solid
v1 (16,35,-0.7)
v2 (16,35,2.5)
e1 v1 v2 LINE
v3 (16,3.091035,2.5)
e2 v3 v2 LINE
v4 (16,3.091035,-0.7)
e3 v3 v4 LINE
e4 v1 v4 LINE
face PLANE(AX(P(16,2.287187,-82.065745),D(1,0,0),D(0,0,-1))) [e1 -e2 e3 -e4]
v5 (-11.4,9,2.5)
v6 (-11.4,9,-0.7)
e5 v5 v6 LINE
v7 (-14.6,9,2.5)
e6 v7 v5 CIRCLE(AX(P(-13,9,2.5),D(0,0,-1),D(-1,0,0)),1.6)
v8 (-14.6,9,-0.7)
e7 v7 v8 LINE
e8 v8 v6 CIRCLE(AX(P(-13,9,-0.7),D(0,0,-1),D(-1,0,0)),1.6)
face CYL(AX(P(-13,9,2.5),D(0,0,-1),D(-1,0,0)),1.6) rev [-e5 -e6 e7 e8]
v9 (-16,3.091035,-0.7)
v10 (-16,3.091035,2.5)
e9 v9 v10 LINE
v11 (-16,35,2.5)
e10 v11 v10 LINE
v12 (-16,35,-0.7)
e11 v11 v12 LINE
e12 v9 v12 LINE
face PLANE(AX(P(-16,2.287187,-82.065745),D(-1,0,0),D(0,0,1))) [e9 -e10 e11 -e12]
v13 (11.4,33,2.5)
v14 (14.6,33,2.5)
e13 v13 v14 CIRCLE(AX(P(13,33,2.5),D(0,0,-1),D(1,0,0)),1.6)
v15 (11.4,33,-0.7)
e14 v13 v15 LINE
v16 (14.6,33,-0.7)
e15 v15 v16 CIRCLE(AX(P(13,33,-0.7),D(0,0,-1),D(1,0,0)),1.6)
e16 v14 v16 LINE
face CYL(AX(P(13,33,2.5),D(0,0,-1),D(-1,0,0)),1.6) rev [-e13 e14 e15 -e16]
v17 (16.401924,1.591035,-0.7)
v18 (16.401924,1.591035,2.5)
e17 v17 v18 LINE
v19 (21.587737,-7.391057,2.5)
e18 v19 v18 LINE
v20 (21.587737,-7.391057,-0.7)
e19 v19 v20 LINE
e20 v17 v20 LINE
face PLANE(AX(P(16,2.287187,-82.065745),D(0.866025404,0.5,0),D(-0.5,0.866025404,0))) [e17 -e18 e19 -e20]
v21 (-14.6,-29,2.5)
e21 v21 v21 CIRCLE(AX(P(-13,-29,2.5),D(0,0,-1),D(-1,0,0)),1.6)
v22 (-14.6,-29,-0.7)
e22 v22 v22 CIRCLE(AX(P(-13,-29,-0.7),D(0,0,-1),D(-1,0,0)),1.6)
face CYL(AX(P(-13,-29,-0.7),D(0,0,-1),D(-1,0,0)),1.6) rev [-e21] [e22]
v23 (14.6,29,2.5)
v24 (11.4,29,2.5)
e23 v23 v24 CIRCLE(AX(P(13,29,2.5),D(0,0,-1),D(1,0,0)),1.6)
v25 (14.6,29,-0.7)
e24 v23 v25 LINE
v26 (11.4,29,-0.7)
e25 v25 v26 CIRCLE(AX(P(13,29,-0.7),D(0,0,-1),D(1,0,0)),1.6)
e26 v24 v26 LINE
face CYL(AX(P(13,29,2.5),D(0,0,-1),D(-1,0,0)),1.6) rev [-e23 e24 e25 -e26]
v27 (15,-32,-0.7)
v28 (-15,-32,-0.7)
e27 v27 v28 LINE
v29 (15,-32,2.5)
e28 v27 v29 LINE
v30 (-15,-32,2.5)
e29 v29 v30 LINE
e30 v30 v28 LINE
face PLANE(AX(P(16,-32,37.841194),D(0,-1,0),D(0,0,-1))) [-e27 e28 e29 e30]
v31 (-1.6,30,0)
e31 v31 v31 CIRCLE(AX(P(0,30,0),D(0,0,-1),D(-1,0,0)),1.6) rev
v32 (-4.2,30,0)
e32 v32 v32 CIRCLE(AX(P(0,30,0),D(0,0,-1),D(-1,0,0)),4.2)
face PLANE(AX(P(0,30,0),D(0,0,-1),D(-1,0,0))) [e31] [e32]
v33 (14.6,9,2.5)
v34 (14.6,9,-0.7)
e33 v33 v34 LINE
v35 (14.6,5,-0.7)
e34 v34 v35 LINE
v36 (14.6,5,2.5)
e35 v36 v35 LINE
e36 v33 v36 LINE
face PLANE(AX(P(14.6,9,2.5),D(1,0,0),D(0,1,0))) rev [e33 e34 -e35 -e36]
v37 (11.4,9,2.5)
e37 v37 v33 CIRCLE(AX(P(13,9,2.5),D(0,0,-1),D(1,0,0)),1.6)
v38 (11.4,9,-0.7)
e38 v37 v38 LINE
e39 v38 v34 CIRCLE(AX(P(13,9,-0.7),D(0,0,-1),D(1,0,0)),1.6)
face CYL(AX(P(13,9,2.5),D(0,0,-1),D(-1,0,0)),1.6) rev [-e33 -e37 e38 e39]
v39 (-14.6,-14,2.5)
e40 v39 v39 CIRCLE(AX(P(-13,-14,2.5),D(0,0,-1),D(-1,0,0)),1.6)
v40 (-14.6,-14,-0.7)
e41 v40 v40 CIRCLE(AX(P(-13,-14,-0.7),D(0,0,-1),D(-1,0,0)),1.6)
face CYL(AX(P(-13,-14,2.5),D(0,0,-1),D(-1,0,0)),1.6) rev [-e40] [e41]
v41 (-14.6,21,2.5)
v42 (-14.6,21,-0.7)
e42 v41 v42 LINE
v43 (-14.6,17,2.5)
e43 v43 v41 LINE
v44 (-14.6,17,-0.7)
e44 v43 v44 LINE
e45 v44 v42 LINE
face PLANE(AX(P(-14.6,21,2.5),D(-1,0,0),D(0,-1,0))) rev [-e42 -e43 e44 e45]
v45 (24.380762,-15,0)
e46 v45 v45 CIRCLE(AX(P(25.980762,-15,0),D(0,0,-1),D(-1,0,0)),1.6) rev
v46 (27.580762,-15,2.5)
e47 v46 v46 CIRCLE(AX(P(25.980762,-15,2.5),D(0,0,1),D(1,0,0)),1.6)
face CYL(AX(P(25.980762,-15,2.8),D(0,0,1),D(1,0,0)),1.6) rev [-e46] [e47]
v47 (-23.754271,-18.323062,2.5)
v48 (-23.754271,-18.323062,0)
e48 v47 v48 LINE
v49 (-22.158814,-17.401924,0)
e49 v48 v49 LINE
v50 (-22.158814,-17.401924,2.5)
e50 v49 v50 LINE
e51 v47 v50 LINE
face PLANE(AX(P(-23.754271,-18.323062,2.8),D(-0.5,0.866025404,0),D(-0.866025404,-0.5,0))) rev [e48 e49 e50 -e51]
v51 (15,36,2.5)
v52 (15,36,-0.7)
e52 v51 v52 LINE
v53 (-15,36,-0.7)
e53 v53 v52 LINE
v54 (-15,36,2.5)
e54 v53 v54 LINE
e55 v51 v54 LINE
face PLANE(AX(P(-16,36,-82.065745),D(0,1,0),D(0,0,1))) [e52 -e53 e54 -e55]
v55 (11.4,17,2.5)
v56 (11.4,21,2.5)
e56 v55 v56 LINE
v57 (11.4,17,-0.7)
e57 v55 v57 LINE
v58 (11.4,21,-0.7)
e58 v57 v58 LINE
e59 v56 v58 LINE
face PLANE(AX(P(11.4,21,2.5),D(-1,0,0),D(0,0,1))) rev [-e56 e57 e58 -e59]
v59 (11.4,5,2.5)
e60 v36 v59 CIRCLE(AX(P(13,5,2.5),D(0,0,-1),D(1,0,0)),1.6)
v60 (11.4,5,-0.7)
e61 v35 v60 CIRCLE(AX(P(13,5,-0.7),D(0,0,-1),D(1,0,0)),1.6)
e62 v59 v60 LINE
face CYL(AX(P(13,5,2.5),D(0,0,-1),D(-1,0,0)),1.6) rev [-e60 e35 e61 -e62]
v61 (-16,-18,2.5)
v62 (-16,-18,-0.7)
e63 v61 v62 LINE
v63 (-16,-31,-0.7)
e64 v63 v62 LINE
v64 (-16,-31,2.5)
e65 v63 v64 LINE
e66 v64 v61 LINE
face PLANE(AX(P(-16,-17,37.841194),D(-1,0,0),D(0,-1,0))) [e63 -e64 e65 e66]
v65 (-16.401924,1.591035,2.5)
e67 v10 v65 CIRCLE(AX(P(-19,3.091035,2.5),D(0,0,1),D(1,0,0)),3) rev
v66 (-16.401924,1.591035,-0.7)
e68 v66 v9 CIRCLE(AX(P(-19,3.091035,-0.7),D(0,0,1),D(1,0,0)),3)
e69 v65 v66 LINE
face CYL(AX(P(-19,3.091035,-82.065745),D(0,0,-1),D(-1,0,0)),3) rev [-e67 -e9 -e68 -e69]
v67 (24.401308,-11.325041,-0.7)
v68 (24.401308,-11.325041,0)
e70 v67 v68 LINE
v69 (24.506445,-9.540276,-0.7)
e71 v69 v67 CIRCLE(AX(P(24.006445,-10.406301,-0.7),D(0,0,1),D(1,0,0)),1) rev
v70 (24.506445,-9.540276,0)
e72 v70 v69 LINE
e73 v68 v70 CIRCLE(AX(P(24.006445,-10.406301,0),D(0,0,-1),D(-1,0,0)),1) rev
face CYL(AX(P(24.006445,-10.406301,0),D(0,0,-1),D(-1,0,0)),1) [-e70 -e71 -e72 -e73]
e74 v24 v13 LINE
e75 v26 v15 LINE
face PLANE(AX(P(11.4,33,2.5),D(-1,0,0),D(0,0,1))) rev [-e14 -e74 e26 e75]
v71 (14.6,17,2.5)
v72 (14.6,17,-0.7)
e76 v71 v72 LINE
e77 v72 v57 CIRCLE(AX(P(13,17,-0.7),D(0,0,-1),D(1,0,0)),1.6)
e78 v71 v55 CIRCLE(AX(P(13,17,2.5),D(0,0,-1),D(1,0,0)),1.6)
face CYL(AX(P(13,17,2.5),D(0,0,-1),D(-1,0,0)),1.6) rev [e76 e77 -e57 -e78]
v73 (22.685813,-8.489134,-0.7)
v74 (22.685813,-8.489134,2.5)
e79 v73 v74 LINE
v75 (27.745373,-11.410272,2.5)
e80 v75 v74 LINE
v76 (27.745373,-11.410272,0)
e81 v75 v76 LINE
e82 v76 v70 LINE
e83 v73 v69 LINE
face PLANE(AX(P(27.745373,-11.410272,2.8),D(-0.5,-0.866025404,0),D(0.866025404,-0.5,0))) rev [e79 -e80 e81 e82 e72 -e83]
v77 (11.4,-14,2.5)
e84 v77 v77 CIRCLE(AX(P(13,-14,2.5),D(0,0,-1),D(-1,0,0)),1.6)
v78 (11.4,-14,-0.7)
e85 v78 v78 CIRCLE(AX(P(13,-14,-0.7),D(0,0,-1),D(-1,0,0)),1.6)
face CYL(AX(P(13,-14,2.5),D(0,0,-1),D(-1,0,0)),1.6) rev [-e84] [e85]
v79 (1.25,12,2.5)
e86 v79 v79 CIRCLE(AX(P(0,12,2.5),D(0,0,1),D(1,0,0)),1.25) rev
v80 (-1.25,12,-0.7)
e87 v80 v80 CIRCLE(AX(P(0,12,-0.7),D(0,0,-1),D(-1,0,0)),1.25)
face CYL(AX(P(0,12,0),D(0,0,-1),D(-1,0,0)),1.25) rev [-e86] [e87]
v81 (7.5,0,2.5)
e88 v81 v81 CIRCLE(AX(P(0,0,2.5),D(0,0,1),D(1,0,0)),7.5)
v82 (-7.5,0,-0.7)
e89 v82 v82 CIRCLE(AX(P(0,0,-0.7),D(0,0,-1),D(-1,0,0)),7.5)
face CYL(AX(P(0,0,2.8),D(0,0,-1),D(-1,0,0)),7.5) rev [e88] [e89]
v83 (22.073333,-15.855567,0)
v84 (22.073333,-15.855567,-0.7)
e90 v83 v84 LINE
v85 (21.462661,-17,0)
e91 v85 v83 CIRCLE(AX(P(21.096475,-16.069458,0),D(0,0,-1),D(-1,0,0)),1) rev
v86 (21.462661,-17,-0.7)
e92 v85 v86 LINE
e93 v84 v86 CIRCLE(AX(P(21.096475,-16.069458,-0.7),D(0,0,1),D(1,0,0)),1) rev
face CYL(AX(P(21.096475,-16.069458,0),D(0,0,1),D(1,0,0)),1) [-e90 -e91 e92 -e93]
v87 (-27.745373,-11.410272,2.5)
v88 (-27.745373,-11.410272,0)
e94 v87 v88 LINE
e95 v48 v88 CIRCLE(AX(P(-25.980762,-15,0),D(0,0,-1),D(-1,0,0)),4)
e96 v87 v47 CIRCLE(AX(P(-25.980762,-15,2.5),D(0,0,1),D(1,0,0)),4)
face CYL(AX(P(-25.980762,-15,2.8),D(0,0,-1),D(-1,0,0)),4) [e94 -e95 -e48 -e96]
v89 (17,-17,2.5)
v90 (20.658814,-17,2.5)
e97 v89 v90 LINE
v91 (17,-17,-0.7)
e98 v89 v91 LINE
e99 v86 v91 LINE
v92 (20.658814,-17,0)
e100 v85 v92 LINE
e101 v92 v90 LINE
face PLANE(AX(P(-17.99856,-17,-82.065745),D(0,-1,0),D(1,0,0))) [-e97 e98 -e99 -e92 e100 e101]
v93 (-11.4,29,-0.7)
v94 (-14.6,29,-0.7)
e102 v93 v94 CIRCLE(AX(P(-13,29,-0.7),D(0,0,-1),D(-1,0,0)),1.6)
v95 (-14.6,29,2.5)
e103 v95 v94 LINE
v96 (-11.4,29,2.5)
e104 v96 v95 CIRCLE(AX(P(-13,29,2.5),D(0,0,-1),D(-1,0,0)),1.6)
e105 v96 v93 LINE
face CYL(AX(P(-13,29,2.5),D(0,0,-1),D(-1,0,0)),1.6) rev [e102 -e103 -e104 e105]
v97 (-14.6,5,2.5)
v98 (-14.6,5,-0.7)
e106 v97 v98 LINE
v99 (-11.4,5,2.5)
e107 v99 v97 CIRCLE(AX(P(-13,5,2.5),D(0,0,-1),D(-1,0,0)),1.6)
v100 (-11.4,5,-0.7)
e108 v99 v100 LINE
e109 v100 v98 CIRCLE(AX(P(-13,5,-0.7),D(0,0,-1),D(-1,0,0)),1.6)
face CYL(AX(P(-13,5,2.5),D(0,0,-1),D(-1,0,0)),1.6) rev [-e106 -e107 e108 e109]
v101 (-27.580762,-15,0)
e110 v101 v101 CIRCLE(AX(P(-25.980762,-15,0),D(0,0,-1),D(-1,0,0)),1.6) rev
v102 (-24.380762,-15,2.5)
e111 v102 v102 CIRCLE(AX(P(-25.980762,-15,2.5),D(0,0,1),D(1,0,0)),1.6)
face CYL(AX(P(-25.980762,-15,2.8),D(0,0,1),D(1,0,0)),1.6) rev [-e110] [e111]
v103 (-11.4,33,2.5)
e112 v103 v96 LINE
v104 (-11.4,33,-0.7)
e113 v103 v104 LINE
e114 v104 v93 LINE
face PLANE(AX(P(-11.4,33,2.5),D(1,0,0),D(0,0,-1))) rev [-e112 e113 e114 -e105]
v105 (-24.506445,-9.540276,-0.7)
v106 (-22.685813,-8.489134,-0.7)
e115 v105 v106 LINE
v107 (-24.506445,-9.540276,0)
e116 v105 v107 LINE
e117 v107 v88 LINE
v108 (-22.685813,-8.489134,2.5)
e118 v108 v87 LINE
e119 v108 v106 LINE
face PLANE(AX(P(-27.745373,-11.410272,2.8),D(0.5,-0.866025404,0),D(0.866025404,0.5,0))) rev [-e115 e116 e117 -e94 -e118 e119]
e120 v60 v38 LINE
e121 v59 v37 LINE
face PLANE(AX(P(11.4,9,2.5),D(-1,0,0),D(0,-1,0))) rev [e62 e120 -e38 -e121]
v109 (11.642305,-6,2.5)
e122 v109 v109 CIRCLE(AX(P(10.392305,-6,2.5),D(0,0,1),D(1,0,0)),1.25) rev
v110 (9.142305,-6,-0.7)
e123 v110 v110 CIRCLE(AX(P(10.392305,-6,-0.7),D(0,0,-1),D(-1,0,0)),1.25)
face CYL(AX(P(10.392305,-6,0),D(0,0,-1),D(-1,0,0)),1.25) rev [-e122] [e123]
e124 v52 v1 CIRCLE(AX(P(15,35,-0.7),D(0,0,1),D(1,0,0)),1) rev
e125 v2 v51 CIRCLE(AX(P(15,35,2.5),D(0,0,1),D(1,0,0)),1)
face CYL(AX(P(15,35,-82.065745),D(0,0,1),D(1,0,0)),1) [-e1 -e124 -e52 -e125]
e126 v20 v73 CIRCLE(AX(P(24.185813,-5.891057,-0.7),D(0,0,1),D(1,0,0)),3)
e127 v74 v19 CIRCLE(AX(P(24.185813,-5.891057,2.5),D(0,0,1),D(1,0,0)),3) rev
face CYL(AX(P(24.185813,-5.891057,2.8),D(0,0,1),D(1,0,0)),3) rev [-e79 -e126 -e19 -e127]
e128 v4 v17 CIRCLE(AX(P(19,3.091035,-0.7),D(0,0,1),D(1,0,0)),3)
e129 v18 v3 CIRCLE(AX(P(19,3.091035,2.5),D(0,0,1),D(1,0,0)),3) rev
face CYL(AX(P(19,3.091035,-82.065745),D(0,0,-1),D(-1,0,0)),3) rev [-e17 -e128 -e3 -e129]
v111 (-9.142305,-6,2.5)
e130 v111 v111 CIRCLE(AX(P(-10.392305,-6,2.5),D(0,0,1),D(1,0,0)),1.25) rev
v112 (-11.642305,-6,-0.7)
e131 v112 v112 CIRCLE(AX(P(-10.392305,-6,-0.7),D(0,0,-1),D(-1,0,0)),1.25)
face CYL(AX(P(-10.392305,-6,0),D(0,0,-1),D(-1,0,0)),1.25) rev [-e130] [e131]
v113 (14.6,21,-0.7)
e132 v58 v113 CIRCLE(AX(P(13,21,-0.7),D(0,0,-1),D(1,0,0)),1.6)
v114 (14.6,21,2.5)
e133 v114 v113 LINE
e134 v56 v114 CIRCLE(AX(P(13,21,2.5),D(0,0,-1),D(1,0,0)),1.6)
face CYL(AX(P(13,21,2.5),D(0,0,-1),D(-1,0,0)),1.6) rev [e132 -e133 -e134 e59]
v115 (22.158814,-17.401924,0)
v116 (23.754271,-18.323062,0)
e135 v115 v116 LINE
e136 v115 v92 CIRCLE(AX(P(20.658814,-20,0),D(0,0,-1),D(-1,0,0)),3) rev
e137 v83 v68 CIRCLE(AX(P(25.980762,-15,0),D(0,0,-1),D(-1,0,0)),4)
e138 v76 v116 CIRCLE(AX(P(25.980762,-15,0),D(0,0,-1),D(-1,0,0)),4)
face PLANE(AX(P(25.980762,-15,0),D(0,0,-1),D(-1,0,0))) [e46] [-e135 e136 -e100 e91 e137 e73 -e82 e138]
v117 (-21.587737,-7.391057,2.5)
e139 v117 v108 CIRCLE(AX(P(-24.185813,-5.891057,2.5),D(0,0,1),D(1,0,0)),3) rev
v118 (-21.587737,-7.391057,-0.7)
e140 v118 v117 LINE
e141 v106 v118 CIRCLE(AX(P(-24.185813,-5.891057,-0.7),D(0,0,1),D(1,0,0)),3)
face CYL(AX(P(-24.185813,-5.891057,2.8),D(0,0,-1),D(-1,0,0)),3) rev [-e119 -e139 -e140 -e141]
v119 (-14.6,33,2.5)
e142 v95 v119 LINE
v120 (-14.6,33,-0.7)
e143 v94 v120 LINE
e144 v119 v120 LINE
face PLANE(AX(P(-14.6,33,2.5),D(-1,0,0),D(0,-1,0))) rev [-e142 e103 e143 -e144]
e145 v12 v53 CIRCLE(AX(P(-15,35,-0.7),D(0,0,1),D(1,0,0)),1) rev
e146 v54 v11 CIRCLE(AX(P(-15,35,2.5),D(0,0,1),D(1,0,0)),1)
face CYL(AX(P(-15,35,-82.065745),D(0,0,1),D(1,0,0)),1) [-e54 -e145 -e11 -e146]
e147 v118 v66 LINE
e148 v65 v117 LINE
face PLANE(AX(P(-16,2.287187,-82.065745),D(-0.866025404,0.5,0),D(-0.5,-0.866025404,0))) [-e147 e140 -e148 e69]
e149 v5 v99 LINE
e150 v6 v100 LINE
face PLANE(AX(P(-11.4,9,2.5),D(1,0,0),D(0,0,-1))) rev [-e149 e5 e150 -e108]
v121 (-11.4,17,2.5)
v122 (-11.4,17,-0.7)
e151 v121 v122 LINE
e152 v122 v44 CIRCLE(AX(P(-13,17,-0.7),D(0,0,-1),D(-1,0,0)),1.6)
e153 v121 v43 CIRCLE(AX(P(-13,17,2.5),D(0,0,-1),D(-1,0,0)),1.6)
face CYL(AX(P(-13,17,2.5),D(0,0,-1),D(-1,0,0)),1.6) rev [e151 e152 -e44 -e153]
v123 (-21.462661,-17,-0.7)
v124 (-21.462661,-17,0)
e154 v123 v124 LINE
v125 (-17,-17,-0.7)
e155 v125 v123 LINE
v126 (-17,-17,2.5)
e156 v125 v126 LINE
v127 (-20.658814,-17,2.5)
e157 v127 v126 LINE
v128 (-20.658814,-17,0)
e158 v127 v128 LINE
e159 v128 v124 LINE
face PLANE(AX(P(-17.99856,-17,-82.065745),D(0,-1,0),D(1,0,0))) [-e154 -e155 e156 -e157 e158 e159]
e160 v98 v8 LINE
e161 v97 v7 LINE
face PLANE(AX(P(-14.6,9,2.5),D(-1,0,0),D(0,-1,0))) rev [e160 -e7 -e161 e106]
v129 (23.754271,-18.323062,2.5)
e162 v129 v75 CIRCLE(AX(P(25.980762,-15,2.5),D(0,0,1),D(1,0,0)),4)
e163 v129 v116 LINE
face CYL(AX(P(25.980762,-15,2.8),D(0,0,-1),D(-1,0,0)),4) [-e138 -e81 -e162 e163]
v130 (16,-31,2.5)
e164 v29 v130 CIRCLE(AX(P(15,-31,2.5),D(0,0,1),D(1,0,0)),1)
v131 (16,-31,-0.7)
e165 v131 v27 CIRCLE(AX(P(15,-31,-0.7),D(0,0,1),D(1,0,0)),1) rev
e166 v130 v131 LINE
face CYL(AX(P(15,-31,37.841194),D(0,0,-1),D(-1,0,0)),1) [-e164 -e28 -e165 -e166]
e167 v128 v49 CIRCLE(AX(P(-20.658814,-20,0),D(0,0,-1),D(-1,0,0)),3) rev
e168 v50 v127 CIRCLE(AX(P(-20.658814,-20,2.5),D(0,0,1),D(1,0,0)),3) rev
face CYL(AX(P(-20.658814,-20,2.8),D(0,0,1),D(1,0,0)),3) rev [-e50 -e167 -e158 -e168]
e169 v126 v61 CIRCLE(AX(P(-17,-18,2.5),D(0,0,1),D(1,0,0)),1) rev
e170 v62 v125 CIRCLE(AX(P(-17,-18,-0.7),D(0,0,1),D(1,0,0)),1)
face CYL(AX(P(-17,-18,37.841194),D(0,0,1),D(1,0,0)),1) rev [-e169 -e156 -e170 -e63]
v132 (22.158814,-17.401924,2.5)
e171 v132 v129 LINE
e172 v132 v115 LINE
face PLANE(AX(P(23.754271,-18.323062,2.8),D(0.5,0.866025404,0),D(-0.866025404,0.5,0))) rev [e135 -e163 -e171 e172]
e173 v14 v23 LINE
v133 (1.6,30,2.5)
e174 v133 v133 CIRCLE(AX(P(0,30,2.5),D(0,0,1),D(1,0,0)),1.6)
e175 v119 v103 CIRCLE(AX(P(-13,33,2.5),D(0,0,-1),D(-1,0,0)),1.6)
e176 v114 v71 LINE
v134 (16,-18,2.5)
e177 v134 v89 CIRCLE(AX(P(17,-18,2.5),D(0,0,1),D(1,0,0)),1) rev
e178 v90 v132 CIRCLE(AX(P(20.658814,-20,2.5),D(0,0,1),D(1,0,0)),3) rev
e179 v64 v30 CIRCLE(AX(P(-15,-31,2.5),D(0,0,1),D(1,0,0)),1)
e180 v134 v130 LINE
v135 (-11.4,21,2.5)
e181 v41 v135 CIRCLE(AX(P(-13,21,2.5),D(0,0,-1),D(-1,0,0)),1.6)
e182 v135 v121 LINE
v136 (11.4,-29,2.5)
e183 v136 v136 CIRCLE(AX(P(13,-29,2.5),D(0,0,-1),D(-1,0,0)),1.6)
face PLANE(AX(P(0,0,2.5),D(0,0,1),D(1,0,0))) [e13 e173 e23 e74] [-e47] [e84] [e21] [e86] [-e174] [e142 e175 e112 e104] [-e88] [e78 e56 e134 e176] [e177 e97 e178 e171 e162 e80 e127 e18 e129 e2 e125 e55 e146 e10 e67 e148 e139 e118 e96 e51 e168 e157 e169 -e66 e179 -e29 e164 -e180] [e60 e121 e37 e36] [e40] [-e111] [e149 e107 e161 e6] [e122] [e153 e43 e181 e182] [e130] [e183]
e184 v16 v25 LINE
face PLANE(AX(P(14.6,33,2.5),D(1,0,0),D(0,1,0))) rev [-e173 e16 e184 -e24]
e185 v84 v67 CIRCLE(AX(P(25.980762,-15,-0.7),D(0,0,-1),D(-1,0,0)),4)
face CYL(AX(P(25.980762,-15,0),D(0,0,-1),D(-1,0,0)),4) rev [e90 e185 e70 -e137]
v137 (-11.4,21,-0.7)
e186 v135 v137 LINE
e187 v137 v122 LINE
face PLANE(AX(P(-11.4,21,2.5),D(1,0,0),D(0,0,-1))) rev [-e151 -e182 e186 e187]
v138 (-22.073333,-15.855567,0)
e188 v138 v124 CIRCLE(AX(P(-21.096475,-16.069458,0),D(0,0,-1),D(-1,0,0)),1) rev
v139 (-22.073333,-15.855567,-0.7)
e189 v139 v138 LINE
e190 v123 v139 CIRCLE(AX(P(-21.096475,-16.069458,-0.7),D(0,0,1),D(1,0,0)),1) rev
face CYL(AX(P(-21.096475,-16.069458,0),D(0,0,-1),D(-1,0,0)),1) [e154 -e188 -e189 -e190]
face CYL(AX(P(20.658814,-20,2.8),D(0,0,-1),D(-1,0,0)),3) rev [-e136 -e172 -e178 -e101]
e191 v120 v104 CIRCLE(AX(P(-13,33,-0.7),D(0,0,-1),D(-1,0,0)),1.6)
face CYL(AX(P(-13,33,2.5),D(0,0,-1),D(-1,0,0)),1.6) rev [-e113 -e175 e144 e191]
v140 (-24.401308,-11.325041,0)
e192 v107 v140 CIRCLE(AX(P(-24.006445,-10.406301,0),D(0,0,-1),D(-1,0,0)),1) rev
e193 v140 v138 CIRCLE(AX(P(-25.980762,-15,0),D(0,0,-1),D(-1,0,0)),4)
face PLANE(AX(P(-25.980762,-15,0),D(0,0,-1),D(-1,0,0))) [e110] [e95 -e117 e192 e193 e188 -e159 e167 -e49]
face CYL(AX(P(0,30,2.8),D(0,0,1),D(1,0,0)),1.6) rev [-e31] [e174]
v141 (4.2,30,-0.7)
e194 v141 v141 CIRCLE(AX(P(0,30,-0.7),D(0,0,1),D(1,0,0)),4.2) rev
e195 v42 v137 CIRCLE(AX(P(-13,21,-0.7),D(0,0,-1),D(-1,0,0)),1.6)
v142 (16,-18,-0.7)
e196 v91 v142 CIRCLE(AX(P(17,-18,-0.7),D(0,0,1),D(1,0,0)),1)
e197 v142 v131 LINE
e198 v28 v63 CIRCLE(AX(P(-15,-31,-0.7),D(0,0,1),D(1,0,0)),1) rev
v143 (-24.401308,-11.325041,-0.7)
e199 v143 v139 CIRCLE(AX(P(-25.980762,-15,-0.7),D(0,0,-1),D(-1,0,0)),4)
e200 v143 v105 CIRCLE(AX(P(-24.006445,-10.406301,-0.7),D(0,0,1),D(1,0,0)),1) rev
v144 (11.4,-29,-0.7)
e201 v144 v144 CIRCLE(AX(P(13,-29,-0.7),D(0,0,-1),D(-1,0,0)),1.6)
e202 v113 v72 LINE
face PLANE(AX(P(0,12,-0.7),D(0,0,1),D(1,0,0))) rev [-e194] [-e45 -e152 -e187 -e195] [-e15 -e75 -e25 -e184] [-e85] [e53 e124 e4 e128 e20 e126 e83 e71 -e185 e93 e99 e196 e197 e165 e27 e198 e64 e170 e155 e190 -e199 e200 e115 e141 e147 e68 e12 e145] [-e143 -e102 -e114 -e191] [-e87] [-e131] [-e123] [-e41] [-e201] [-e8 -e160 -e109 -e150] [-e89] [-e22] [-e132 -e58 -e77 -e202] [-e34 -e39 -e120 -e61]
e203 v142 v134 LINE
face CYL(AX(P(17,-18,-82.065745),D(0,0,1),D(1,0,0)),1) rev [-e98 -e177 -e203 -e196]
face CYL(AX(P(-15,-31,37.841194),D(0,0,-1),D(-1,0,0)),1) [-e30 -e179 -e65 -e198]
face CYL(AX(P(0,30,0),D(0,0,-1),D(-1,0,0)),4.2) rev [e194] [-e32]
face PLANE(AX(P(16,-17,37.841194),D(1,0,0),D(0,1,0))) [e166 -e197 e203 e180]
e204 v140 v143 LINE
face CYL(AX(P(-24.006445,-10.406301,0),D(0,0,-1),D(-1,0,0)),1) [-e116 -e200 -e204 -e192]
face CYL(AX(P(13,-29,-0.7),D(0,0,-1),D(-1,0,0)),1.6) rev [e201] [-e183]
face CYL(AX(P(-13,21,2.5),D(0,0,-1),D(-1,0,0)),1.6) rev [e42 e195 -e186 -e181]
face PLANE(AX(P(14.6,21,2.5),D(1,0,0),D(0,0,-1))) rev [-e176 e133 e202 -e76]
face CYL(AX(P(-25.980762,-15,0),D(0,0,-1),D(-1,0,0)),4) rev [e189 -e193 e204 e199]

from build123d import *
from build123d.topology import SkipClean

# Parameters (mm, degrees)
SKETCH2_R               = 7.5
BOSS_EXTRUDE1_DEPTH     = 2.8
M3_CLEARANCE_HOLE1_D    = 3.2
M3X0_5_TAPPED_HOLE1_D   = 2.5
SKETCH8_R               = 1.25
SKETCH8_R_2             = 7.5
BOSS_EXTRUDE2_DEPTH     = 0.7
CUT_EXTRUDE1_DEPTH      = 46.416804125
CUT_EXTRUDE1_DEPTH_BACK = 46.416804125
FILLET3_R               = 2.5
MOVE_FACE2_BY           = 0.1
SKETCH18_R              = 1.25
SKETCH18_R_2            = 7.5
SKETCH18_R_3            = 1.6
BOSS_EXTRUDE5_DEPTH     = 3.4
MOVE_START              = -17
MOVE_FACE5_OUTLINE_W    = 42.925322608
MOVE_FACE5_OUTLINE_H    = 3.4
MOVE_FACE5_DEPTH        = 2
SKETCH19_R              = 4
CUT_EXTRUDE3_DEPTH      = 0.7
FILLET5_R               = 1
MOVE_FACE3_BY           = 0.2
MOVE_FACE4_BY           = 0.2
FILLET6_R               = 3
CUT_EXTRUDE4_DEPTH      = 47.958344273
SKETCH22_R              = 1.6
CUT_EXTRUDE7_DEPTH      = 47.958344273
SKETCH25_W              = 32
SKETCH25_H              = 15
BOSS_EXTRUDE6_DEPTH     = 3.2
M3_CLEARANCE_HOLE2_D    = 3.2
FILLET7_R               = 1


with BuildPart() as part:
    # Sketch2 → Boss-Extrude1 (new body)
    with BuildSketch(Plane.XY):
        with BuildLine():
            Line((27.745372612, -11.410271628), (3.991101213, 29.733333333))
            ThreePointArc((3.991101213, 29.733333333), (0, 34), (-3.991101213, 29.733333333))
            Line((-3.991101213, 29.733333333), (-27.745372612, -11.410271628))
            ThreePointArc((-27.745372612, -11.410271628), (-29.444863729, -17), (-23.7542714, -18.323061706))
            Line((-23.7542714, -18.323061706), (23.7542714, -18.323061706))
            ThreePointArc((23.7542714, -18.323061706), (29.444863729, -17), (27.745372612, -11.410271628))
        make_face()
        Circle(SKETCH2_R, mode=Mode.SUBTRACT)
    extrude(amount=BOSS_EXTRUDE1_DEPTH)

    # M3 Clearance Hole1 (through all)
    with Locations(Plane.XY.offset(2.8)):
        with Locations((0, 30), (-25.980762114, -15), (25.980762114, -15)):
            Hole(M3_CLEARANCE_HOLE1_D / 2)

    # M3x0.5 Tapped Hole1 (through all)
    with Locations(Plane(origin=(0, 0, 0), x_dir=(-1, 0, 0), z_dir=(0, 0, -1))):
        with Locations((10.392304845, -6), (0, 12), (-10.392304845, -6)):
            Hole(M3X0_5_TAPPED_HOLE1_D / 2)

    # Sketch8 → Boss-Extrude2 (add)
    with SkipClean():  # the faces are left unmerged after this step: merging them gives an invalid solid
        with BuildSketch(Plane(origin=(0, 0, 0), x_dir=(-1, 0, 0), z_dir=(0, 0, -1))):
            with BuildLine():
                Line((-3.464101615, 14), (-13.856406461, -4))
                ThreePointArc((-13.856406461, -4), (-13.856406461, -8), (-10.392304845, -10))
                Line((-10.392304845, -10), (10.392304845, -10))
                ThreePointArc((10.392304845, -10), (13.856406461, -8), (13.856406461, -4))
                Line((13.856406461, -4), (3.464101615, 14))
                ThreePointArc((3.464101615, 14), (0, 16), (-3.464101615, 14))
            make_face()
            with Locations((-10.392304845, -6)):
                Circle(SKETCH8_R, mode=Mode.SUBTRACT)
            with Locations((0, 12)):
                Circle(SKETCH8_R, mode=Mode.SUBTRACT)
            with Locations((10.392304845, -6)):
                Circle(SKETCH8_R, mode=Mode.SUBTRACT)
            Circle(SKETCH8_R_2, mode=Mode.SUBTRACT)
        extrude(amount=BOSS_EXTRUDE2_DEPTH)
    add(part.part.scale(1), mode=Mode.REPLACE)  # the faces are merged on a copy

    # Sketch9 → Cut-Extrude1 (cut, two sides: drawn at the far end of the back side and taken through both)
    with BuildSketch(Plane(origin=(0, 0, 0), x_dir=(-1, 0, 0), z_dir=(0, 0, -1)).offset(-CUT_EXTRUDE1_DEPTH_BACK)):
        Polygon((27.745372612, -11.410271628), (3.991101213, 29.733333333), (3.991101213, 17.087209922), (16.793508478, -5.087209922), align=None)
        Polygon((12.802407266, -12), (-12.802407266, -12), (-23.7542714, -18.323061706), (23.7542714, -18.323061706), align=None)
        Polygon((-16.793508478, -5.087209922), (-3.991101213, 17.087209922), (-3.991101213, 29.733333333), (-27.745372612, -11.410271628), align=None)
    extrude(amount=CUT_EXTRUDE1_DEPTH + CUT_EXTRUDE1_DEPTH_BACK, mode=Mode.SUBTRACT)

    # Fillet3
    fillet3_edges = [part.edges().sort_by_distance(p)[0] for p in [
        (3.991101213, 17.087209922, 1.4),
        (16.793508478, -5.087209922, 1.4),
        (12.802407266, -12, 1.4),
        (-12.802407266, -12, 1.4),
        (-16.793508478, -5.087209922, 1.4),
        (-3.991101213, 17.087209922, 1.4),
    ]]
    fillet(fillet3_edges, radius=FILLET3_R)

    # Move Face2: a face moved inward by 0.1
    extrude(part.faces().sort_by_distance((0, 20.75, 2.8))[0], amount=MOVE_FACE2_BY, dir=(0, 0, -1), mode=Mode.SUBTRACT)

    # Sketch18 → Boss-Extrude5 (add)
    with BuildSketch(Plane.XY.offset(2.7)):
        with BuildLine():
            Line((-17.998559688, -15), (17.998559688, -15))
            Line((17.998559688, -15), (23.7542714, -18.323061706))
            ThreePointArc((23.7542714, -18.323061706), (29.444863729, -17), (27.745372612, -11.410271628))
            Line((27.745372612, -11.410271628), (21.989660901, -8.087209922))
            Line((21.989660901, -8.087209922), (16, 2.287187079))
            Line((16, 2.287187079), (16, 36))
            Line((16, 36), (-16, 36))
            Line((-16, 36), (-16, 2.287187079))
            Line((-16, 2.287187079), (-21.989660901, -8.087209922))
            Line((-21.989660901, -8.087209922), (-27.745372612, -11.410271628))
            ThreePointArc((-27.745372612, -11.410271628), (-29.444863729, -17), (-23.7542714, -18.323061706))
            Line((-23.7542714, -18.323061706), (-17.998559688, -15))
        make_face()
        with Locations(Location((0, 12, 0), (0, 0, 180))):
            Circle(SKETCH18_R, mode=Mode.SUBTRACT)
        with Locations(Location((10.392304845, -6, 0), (0, 0, 180))):
            Circle(SKETCH18_R, mode=Mode.SUBTRACT)
        with Locations(Location((-10.392304845, -6, 0), (0, 0, 180))):
            Circle(SKETCH18_R, mode=Mode.SUBTRACT)
        with Locations(Location((0, 0, 0), (0, 0, 180))):
            Circle(SKETCH18_R_2, mode=Mode.SUBTRACT)
        with Locations((0, 30)):
            Circle(SKETCH18_R_3, mode=Mode.SUBTRACT)
        with Locations((-25.980762114, -15)):
            Circle(SKETCH18_R_3, mode=Mode.SUBTRACT)
        with Locations((25.980762114, -15)):
            Circle(SKETCH18_R_3, mode=Mode.SUBTRACT)
    extrude(amount=-BOSS_EXTRUDE5_DEPTH)

    # Move Face5: read off the stored shape, not the designer's step
    # Move Face5 outline → Move Face5 (add)
    with BuildSketch(Plane(origin=(0, 0, 0), x_dir=(1, 0, 0), z_dir=(0, 1, 0)).offset(MOVE_START)):
        with Locations((0, -1)):
            Rectangle(MOVE_FACE5_OUTLINE_W, MOVE_FACE5_OUTLINE_H)
    extrude(amount=MOVE_FACE5_DEPTH)

    # Sketch19 → Cut-Extrude3 (cut)
    with BuildSketch(Plane(origin=(0, 0, -0.7), x_dir=(-1, 0, 0), z_dir=(0, 0, -1))):
        with Locations((25.980762114, -15)):
            Circle(SKETCH19_R)
        with Locations((-25.980762114, -15)):
            Circle(SKETCH19_R)
        with Locations((0, 30)):
            Circle(SKETCH19_R)
    extrude(amount=-CUT_EXTRUDE3_DEPTH, mode=Mode.SUBTRACT)

    # Fillet5
    # the kernel refuses this fillet: 1 mm, written as the material it takes off along each edge
    with BuildSketch(Plane(origin=(-23.7542714, -18.323061706, 0), x_dir=(0.5630065866190214, 0.8264524084444297, 0), z_dir=(0, 0, -1)), Plane(origin=(23.7542714, -18.323061706, -8.164117066), x_dir=(-0.5630065866190195, 0.826452408444431, -1.7271463390342054e-15), z_dir=(0, 0, 1))) as fillet5_piece_1:
        with BuildLine():
            CenterArc((3.35885268, 0.92774856), FILLET5_R, 167.216617388, 80.869915665)
            Line((2.383639111, 1.149014228), (0, 0))
            ThreePointArc((0, 0), (1.492823413, 0.289005759), (2.985646826, 0))
        make_face()
    extrude(amount=8.164117066, mode=Mode.SUBTRACT)
    with BuildSketch(Plane(origin=(-27.745372612, -11.410271628, 0), x_dir=(0.9996753598266718, 0.025478911974695106, 0), z_dir=(0, 0, -1)), Plane(origin=(27.745372612, -11.410271628, -10.049979958), x_dir=(-0.9996753598266713, 0.02547891197471748, -2.7505093848186077e-14), z_dir=(0, 0, 1))) as fillet5_piece_2:
        with BuildLine():
            CenterArc((3.763294339, -0.90838084), FILLET5_R, 114.717454154, 126.742537963)
            Line((3.285522044, -1.786864553), (0, 0))
            ThreePointArc((0, 0), (1.672575262, -0.366476642), (3.345150524, 0))
        make_face()
    extrude(amount=10.049979958, mode=Mode.SUBTRACT)
    with BuildSketch(Plane(origin=(-16, 36, 5.2), x_dir=(0, -1, 0), z_dir=(0, 0, -1)), Plane(origin=(16, 36, 5.2), x_dir=(-1, 0, 0), z_dir=(0, 0, -1))) as fillet5_piece_3:
        with BuildLine():
            CenterArc((FILLET5_R, -FILLET5_R), FILLET5_R, 90, 90)
            Line((0, -FILLET5_R), (0, 0))
            Line((0, 0), (FILLET5_R, 0))
        make_face()
    extrude(amount=8.4, mode=Mode.SUBTRACT)

    # Move Face3: a curved face moved inward by 0.2
    add(Solid.thicken(part.faces().sort_by_distance((4, 30, -0.35))[0], -MOVE_FACE3_BY), mode=Mode.SUBTRACT)

    # Move Face4: a face moved inward by 0.2
    extrude(part.faces().sort_by_distance((0, 8.5, 2.7))[0], amount=MOVE_FACE4_BY, dir=(0, 0, -1), mode=Mode.SUBTRACT)

    # Fillet6
    fillet6_edges = [part.edges().sort_by_distance(p)[0] for p in [
        (-21.989660901, -8.087209922, 0.9),
        (21.989660901, -8.087209922, 0.9),
        (21.462661304, -17, 1.25),
        (16, 2.287187079, 0.9),
        (-16, 2.287187079, 0.9),
        (-21.462661304, -17, 1.25),
    ]]
    fillet(fillet6_edges, radius=FILLET6_R)

    # Sketch20 → Cut-Extrude4 (cut, through all)
    with BuildSketch(Plane(origin=(0, 0, -0.7), x_dir=(-1, 0, 0), z_dir=(0, 0, -1))):
        with BuildLine():
            Line((14.6, 33), (14.6, 29))
            ThreePointArc((14.6, 29), (13, 27.4), (11.4, 29))
            Line((11.4, 29), (11.4, 33))
            ThreePointArc((11.4, 33), (13, 34.6), (14.6, 33))
        make_face()
        with BuildLine():
            Line((11.4, 21), (11.4, 17))
            ThreePointArc((11.4, 17), (13, 15.4), (14.6, 17))
            Line((14.6, 17), (14.6, 21))
            ThreePointArc((14.6, 21), (13, 22.6), (11.4, 21))
        make_face()
        with BuildLine():
            Line((11.4, 9), (11.4, 5))
            ThreePointArc((11.4, 5), (13, 3.4), (14.6, 5))
            Line((14.6, 5), (14.6, 9))
            ThreePointArc((14.6, 9), (13, 10.6), (11.4, 9))
        make_face()
        with BuildLine():
            Line((-14.6, 33), (-14.6, 29))
            ThreePointArc((-14.6, 29), (-13, 27.4), (-11.4, 29))
            Line((-11.4, 29), (-11.4, 33))
            ThreePointArc((-11.4, 33), (-13, 34.6), (-14.6, 33))
        make_face()
        with BuildLine():
            Line((-14.6, 21), (-14.6, 17))
            ThreePointArc((-14.6, 17), (-13, 15.4), (-11.4, 17))
            Line((-11.4, 17), (-11.4, 21))
            ThreePointArc((-11.4, 21), (-13, 22.6), (-14.6, 21))
        make_face()
        with BuildLine():
            Line((-14.6, 9), (-14.6, 5))
            ThreePointArc((-14.6, 5), (-13, 3.4), (-11.4, 5))
            Line((-11.4, 5), (-11.4, 9))
            ThreePointArc((-11.4, 9), (-13, 10.6), (-14.6, 9))
        make_face()
    extrude(amount=-CUT_EXTRUDE4_DEPTH, mode=Mode.SUBTRACT)

    # Sketch22 → Cut-Extrude7 (cut, through all)
    with BuildSketch(Plane(origin=(0, 0, -0.7), x_dir=(-1, 0, 0), z_dir=(0, 0, -1))):
        with Locations((13, -14)):
            Circle(SKETCH22_R)
        with Locations((-13, -14)):
            Circle(SKETCH22_R)
    extrude(amount=-CUT_EXTRUDE7_DEPTH, mode=Mode.SUBTRACT)

    # Sketch25 → Boss-Extrude6 (add)
    with BuildSketch(Plane(origin=(0, 0, -0.7), x_dir=(-1, 0, 0), z_dir=(0, 0, -1))):
        with Locations((0, -24.5)):
            Rectangle(SKETCH25_W, SKETCH25_H)
    extrude(amount=-BOSS_EXTRUDE6_DEPTH)

    # M3 Clearance Hole2 (through all)
    with Locations(Plane(origin=(0, 0, -0.7), x_dir=(-1, 0, 0), z_dir=(0, 0, -1))):
        with Locations((-13, -29), (13, -29)):
            Hole(M3_CLEARANCE_HOLE2_D / 2)

    # Fillet7
    fillet7_edges = [part.edges().sort_by_distance(p)[0] for p in [
        (-16, -32, 0.9),
        (-16, -17, 0.9),
        (16, -17, 0.9),
        (16, -32, 0.9),
    ]]
    fillet(fillet7_edges, radius=FILLET7_R)


solid = part.part
